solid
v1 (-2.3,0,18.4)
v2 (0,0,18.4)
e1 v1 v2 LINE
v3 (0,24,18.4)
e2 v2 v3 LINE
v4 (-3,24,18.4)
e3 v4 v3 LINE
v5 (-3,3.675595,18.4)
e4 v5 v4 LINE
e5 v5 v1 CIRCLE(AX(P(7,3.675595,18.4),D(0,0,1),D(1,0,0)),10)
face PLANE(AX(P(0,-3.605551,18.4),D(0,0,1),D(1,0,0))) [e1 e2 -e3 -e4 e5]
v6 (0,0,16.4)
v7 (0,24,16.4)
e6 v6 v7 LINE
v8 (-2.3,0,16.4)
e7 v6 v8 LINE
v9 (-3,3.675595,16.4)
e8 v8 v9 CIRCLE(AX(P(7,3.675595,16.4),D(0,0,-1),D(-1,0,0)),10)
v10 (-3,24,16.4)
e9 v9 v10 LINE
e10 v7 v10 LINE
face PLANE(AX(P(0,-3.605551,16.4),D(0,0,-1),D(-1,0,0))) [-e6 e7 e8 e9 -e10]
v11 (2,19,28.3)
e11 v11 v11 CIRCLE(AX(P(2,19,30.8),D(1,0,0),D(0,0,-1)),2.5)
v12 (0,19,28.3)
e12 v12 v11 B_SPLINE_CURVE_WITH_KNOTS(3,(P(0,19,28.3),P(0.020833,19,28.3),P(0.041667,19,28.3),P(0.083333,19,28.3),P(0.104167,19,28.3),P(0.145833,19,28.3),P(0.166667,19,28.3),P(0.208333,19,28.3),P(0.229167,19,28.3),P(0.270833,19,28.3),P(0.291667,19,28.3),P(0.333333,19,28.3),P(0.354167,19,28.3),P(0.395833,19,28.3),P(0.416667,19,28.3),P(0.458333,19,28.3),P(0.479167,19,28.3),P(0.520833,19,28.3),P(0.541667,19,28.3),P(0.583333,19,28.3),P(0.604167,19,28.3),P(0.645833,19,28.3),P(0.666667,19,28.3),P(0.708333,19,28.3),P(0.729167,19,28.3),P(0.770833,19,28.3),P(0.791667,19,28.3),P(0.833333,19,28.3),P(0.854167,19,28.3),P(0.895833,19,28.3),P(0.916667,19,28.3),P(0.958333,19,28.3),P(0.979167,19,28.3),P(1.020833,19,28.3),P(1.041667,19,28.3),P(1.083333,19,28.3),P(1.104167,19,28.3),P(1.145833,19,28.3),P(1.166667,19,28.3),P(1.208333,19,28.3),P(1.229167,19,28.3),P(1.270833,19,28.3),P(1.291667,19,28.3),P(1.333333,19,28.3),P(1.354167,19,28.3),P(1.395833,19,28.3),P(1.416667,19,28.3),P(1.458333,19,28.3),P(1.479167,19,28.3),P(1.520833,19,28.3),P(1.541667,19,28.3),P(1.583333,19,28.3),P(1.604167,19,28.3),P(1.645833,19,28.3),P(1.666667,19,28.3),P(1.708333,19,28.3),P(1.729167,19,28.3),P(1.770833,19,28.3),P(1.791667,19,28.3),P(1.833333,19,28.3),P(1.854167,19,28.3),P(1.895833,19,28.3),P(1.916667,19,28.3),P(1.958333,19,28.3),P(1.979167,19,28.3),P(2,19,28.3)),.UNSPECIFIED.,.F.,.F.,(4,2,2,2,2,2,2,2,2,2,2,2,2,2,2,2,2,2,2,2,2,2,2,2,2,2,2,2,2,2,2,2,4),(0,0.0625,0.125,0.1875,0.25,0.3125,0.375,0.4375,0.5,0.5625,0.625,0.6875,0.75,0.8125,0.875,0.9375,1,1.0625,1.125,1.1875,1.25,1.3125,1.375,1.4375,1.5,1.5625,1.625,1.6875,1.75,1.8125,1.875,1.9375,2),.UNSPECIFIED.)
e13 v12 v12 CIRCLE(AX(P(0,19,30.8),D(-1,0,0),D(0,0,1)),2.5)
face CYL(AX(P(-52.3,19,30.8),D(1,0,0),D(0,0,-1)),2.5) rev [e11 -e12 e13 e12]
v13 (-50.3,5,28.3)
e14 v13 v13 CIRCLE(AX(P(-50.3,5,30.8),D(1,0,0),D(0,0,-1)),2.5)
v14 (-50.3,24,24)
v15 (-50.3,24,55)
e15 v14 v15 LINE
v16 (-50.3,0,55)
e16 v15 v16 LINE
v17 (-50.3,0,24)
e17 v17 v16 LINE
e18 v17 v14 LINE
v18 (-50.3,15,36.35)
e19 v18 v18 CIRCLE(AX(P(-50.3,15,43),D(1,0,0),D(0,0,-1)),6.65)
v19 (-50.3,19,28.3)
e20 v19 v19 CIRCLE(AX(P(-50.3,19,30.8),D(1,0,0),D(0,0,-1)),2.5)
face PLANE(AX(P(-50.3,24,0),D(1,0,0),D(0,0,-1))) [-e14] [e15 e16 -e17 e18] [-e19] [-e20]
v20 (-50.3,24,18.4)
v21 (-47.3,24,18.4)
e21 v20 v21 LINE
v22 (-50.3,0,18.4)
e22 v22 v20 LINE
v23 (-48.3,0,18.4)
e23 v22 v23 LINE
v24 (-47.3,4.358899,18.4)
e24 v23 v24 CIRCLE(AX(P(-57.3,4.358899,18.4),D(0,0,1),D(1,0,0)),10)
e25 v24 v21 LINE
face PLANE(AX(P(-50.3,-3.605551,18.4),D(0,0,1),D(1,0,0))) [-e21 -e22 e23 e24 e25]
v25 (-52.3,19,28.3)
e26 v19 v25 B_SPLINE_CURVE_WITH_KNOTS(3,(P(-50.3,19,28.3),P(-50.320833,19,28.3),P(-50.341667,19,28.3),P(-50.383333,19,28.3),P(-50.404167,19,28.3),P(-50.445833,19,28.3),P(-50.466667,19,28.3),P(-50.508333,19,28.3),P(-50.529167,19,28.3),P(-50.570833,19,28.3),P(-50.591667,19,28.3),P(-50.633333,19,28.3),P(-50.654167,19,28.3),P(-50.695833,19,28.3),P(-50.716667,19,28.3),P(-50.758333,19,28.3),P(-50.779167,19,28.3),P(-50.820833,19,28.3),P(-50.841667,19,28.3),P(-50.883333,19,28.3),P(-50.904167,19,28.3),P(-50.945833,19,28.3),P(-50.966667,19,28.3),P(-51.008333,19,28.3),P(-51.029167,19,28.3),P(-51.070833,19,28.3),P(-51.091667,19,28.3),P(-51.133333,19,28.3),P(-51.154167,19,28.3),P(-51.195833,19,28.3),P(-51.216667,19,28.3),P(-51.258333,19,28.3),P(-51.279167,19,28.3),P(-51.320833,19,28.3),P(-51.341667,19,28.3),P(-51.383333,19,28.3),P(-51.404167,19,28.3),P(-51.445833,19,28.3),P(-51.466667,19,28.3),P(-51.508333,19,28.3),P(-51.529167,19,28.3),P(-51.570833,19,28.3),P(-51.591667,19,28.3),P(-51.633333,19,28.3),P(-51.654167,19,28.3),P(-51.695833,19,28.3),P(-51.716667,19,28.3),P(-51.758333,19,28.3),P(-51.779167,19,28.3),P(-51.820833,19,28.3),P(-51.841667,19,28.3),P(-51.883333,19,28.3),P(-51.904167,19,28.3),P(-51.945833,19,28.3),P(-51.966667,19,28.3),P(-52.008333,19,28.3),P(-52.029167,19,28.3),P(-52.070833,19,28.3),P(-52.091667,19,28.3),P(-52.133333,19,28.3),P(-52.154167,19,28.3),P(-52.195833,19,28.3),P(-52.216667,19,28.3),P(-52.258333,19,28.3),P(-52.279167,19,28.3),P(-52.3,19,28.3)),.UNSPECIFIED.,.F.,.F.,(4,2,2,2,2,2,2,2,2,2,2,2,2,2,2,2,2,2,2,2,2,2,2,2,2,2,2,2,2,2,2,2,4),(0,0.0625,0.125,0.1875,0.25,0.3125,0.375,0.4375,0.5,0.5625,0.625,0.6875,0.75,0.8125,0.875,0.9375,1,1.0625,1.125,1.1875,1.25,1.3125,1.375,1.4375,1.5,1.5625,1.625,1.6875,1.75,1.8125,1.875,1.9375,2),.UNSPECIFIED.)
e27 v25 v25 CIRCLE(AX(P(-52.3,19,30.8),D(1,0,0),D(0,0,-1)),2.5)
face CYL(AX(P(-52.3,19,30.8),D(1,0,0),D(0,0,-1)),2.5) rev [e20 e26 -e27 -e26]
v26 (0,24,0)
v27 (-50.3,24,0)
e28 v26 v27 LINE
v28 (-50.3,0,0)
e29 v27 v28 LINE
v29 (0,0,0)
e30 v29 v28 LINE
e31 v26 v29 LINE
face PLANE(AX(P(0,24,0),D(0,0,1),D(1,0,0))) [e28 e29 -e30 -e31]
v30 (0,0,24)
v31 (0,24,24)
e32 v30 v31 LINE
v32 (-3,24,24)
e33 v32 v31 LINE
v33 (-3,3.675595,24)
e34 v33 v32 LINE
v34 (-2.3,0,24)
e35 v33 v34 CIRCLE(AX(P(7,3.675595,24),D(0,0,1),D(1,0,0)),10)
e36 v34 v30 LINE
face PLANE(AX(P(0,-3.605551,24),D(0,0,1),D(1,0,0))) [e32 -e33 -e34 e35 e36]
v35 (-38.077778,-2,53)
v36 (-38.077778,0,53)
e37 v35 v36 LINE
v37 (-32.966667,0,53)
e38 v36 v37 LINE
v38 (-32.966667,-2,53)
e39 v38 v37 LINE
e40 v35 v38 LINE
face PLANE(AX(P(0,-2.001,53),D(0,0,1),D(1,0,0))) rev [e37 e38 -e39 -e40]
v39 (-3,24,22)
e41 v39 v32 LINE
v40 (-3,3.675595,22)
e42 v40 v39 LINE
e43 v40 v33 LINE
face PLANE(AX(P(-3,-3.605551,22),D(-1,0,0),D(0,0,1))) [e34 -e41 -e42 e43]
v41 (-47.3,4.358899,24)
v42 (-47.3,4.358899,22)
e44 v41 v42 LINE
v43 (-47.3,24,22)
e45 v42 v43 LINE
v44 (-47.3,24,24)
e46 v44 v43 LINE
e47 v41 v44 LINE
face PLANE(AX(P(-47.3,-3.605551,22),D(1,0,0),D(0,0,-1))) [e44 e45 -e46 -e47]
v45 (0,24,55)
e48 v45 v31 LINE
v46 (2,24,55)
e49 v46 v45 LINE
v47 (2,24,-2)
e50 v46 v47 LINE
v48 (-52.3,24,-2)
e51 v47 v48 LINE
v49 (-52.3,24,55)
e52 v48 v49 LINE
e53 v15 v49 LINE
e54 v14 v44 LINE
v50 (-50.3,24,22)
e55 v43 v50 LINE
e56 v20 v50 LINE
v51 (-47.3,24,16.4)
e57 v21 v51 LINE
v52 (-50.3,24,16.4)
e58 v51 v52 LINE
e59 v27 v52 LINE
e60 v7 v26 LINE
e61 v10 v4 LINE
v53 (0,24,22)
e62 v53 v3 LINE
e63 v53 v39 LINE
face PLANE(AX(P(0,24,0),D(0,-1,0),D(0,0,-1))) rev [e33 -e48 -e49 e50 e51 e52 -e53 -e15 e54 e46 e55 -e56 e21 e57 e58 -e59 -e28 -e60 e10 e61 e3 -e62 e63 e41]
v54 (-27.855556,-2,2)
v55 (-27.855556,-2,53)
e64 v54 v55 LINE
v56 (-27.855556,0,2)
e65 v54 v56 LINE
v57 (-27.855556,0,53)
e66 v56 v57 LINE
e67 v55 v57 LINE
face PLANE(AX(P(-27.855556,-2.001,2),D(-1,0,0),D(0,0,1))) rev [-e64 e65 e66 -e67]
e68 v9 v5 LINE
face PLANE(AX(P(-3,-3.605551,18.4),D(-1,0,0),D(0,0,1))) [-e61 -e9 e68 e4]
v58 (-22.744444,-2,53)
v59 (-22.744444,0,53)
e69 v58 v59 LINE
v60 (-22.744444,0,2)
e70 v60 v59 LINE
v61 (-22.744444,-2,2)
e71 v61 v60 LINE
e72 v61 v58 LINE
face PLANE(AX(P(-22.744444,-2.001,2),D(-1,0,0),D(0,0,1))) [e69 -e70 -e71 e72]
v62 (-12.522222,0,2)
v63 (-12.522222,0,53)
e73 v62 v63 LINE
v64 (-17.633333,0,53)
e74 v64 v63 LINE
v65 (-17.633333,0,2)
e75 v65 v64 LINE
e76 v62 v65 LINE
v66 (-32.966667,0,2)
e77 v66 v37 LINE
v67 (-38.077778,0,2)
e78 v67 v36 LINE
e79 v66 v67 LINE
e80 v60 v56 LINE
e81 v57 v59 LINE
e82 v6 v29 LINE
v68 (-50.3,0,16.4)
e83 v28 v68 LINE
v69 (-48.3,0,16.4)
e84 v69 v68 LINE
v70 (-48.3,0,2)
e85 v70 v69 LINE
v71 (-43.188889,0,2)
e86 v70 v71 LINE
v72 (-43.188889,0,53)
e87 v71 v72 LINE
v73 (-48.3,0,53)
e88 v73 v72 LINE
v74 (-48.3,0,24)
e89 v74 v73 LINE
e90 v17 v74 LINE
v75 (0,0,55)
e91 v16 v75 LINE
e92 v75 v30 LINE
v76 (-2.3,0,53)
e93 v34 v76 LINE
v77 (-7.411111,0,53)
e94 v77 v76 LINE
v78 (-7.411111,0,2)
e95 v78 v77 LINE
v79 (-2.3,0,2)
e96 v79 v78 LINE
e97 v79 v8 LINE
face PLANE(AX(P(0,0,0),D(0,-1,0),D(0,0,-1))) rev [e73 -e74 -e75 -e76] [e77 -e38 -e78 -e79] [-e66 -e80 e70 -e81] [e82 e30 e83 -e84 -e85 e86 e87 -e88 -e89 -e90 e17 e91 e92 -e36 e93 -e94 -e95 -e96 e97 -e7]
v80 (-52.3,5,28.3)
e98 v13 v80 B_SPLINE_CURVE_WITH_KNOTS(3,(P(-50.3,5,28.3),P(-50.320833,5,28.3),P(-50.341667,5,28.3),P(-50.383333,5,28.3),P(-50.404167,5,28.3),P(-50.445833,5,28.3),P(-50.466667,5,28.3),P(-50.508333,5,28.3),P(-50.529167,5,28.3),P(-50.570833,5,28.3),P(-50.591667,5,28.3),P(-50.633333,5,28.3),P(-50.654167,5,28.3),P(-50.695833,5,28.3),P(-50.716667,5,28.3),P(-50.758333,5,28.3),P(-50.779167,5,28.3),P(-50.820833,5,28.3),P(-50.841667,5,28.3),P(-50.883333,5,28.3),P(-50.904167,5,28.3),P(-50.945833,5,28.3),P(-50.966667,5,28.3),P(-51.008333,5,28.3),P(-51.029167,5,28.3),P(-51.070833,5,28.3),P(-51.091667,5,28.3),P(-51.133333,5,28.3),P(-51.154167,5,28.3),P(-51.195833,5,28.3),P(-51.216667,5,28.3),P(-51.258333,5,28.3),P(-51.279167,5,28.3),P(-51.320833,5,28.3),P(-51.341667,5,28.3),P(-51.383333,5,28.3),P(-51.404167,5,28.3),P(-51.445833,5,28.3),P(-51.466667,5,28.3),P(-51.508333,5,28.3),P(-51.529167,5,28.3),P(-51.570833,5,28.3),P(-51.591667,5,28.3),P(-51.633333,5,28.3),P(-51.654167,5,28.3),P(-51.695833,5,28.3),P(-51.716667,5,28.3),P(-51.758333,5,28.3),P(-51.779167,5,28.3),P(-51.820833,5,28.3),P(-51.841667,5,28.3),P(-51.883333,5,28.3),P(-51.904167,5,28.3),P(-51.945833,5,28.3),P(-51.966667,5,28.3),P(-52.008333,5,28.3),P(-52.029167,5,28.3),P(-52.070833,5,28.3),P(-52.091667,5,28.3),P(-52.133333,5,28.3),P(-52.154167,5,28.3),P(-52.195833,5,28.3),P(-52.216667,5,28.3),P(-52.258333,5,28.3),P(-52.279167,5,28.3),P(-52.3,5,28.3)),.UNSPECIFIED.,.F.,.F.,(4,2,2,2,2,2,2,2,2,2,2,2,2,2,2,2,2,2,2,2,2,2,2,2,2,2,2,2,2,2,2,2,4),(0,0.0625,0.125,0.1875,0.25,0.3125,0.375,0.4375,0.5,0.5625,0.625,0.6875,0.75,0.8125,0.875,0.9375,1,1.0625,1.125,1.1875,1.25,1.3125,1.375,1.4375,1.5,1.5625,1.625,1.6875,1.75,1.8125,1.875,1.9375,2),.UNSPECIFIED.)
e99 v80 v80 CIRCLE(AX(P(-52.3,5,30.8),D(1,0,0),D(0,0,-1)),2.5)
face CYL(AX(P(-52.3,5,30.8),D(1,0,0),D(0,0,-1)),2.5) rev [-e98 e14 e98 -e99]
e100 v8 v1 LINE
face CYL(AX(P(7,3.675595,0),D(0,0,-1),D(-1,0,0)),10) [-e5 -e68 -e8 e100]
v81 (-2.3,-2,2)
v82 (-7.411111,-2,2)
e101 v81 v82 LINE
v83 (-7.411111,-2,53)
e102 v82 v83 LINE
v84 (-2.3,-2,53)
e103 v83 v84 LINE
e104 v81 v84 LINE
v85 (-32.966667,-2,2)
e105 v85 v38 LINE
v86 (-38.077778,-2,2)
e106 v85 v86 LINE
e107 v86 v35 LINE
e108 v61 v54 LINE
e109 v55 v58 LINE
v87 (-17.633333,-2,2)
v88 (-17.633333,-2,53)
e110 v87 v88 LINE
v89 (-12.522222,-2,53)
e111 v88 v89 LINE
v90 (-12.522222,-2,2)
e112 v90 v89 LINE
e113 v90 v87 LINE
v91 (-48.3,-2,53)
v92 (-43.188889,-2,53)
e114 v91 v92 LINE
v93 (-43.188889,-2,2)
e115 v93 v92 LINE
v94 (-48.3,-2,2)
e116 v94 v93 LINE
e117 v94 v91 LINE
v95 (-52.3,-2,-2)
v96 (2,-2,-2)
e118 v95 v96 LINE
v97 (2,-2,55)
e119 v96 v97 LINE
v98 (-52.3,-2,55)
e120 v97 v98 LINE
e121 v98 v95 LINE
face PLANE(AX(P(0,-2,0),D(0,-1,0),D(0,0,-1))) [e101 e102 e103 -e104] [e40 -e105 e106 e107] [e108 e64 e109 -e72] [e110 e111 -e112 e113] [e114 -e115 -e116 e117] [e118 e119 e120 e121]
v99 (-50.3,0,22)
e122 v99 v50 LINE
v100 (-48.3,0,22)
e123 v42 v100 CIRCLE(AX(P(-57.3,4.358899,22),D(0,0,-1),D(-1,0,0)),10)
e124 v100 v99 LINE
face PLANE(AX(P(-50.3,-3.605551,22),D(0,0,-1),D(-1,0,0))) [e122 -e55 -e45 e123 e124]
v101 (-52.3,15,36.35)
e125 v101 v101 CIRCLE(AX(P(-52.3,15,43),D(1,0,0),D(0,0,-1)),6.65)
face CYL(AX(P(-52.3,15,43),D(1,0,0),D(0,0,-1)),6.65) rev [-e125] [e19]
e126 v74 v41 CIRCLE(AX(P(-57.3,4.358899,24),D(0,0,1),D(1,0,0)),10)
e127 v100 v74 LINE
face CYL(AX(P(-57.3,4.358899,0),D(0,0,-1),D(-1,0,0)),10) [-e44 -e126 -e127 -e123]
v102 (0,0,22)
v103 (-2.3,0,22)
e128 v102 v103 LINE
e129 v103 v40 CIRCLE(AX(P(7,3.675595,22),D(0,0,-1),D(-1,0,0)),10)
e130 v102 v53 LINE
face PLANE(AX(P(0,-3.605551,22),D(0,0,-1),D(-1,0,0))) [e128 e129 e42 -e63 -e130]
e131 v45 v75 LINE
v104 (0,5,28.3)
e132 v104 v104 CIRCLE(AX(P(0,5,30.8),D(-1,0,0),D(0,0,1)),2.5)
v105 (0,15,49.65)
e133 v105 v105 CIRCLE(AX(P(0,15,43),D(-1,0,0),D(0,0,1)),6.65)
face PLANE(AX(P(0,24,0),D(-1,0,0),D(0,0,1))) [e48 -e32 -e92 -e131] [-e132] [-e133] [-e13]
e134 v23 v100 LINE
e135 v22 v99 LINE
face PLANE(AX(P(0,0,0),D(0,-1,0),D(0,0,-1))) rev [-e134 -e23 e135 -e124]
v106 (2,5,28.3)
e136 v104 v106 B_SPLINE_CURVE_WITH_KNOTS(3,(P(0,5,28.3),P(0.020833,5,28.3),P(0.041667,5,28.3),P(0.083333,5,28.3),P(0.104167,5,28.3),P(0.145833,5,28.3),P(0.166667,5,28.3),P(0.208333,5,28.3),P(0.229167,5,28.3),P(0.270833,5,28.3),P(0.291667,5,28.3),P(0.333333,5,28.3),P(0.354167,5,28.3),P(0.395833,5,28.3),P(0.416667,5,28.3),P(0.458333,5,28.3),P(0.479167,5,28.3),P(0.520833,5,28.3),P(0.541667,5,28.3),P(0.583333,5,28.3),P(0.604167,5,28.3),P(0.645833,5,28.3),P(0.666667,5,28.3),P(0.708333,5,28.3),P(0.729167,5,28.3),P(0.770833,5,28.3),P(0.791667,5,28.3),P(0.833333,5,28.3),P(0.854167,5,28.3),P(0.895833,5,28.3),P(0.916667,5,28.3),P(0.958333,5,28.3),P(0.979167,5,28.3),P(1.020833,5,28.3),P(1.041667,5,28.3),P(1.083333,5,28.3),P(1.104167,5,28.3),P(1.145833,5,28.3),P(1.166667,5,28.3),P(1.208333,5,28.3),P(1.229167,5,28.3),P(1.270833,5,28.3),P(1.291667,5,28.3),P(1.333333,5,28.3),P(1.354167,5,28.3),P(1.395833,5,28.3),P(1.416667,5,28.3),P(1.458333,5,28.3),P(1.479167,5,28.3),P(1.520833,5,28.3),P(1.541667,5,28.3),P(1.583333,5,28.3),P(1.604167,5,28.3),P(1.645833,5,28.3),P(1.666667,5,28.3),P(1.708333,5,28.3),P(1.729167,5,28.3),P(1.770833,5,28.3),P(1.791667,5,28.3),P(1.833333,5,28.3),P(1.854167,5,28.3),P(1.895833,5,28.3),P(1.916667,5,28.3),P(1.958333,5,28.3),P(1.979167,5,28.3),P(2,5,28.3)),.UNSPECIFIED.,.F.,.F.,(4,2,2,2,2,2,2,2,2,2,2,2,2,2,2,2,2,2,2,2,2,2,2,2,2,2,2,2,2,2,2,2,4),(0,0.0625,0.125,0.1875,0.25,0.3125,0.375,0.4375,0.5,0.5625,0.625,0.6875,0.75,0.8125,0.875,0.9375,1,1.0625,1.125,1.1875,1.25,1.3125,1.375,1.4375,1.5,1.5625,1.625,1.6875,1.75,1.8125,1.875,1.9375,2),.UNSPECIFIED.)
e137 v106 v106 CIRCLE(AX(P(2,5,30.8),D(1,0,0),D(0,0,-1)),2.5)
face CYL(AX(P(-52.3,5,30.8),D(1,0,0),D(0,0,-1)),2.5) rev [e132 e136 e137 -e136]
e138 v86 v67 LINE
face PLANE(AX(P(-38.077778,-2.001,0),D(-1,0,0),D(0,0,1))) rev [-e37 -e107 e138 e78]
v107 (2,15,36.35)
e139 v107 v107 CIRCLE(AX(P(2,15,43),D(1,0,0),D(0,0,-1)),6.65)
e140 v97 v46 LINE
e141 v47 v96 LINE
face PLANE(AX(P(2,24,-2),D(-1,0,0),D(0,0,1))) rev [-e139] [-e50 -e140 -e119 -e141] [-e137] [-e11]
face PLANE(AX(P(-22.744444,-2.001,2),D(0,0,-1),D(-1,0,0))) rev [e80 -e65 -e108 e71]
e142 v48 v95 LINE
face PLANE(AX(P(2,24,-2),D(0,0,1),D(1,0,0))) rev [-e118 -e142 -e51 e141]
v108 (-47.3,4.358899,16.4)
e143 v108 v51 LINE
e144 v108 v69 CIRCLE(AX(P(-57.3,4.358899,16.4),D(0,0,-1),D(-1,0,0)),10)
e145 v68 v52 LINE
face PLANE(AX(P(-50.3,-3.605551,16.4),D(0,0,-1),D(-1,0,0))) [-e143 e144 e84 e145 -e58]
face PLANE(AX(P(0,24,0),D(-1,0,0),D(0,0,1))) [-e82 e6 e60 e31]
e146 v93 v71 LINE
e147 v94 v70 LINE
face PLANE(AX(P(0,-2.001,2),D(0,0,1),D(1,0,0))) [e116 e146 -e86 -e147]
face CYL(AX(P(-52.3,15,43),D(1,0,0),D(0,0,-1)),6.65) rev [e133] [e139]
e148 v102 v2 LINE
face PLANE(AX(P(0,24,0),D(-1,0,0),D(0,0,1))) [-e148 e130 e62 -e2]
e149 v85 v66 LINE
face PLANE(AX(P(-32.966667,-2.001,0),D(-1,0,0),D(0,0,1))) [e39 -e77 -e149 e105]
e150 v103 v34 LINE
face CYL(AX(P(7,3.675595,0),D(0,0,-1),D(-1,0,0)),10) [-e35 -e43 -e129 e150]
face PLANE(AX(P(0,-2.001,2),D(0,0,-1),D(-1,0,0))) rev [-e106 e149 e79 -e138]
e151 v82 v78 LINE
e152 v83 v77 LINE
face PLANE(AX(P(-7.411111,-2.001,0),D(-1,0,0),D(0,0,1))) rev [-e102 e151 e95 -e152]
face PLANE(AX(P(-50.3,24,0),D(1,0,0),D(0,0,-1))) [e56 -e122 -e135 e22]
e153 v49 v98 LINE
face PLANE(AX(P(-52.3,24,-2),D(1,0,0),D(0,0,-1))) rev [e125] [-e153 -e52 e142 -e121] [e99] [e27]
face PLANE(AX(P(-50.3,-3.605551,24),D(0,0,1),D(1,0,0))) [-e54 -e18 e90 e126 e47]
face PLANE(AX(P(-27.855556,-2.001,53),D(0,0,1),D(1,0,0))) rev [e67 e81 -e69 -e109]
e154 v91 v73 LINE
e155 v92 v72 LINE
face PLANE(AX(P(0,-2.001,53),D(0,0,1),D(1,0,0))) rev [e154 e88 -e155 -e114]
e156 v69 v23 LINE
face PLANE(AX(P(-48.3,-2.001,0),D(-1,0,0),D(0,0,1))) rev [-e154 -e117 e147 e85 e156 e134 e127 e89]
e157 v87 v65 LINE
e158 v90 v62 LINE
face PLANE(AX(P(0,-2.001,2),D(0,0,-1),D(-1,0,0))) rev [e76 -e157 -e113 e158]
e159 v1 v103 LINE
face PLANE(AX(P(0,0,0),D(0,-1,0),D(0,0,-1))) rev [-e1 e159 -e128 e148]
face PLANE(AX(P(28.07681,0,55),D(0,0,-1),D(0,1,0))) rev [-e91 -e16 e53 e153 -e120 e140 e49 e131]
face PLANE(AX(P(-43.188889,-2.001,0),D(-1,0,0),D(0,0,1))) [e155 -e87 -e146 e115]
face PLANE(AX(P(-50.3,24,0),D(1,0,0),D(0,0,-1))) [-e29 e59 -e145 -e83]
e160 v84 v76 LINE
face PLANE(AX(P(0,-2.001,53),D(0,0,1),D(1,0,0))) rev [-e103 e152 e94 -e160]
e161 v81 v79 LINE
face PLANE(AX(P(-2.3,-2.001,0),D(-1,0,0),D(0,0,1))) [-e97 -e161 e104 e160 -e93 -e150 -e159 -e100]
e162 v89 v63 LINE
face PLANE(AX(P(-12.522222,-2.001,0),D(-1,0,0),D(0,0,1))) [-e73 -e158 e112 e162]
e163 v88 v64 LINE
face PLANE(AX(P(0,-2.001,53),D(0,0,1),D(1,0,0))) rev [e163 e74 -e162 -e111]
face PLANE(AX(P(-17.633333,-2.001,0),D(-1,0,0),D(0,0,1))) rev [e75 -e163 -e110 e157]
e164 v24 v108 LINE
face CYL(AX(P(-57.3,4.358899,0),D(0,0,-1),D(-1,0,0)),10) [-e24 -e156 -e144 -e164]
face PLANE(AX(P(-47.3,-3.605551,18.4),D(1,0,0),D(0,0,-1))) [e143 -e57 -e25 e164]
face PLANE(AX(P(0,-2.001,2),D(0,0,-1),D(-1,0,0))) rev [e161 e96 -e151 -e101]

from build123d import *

# Parameters (mm, degrees)
CROQUIS1_W                 = 54.3
CROQUIS1_H                 = 59
CROQUIS1_W_2               = 50.3
CROQUIS1_H_2               = 55
SALIENTE_EXTRUIR1_DEPTH    = 24
CROQUIS2_W                 = 54.3
CROQUIS2_H                 = 59
SALIENTE_EXTRUIR2_DEPTH    = 2
CORTAR_EXTRUIR4_DEPTH      = 54.3
CORTAR_EXTRUIR5_REACH      = 81.601
CROQUIS7_W                 = 5.111111111
CROQUIS7_H                 = 51
CROQUIS7_W_2               = 5.111111112
CORTAR_EXTRUIR6_DEPTH      = 66.864425147
CORTAR_EXTRUIR6_DEPTH_BACK = 66.864425147
CROQUIS8_R                 = 6.65
CORTAR_EXTRUIR7_DEPTH      = 66.864425147
CORTAR_EXTRUIR7_DEPTH_BACK = 66.864425147
CROQUIS9_R                 = 2.5
CROQUIS10_W                = 3
CROQUIS10_H                = 2
SALIENTE_EXTRUIR3_DEPTH    = 24
REDONDEO1_R                = 10


with BuildPart() as part:
    # Croquis1 → Saliente-Extruir1 (new body)
    with BuildSketch(Plane(origin=(0, 0, 0), x_dir=(1, 0, 0), z_dir=(0, 1, 0))):
        with Locations((-25.15, -27.5)):
            Rectangle(CROQUIS1_W, CROQUIS1_H)
        with Locations((-25.15, -27.5)):
            Rectangle(CROQUIS1_W_2, CROQUIS1_H_2, mode=Mode.SUBTRACT)
    extrude(amount=SALIENTE_EXTRUIR1_DEPTH)

    # Croquis2 → Saliente-Extruir2 (add)
    with BuildSketch(Plane.XZ):
        with Locations((-25.15, 27.5)):
            Rectangle(CROQUIS2_W, CROQUIS2_H)
    extrude(amount=SALIENTE_EXTRUIR2_DEPTH)

    # Croquis6 → Cortar-Extruir4 (cut)
    with BuildSketch(Plane.ZY.offset(52.3)):
        Polygon((55, 24), (55, 0), (55, -2), (57, -2), (57, 24), align=None)
    extrude(amount=-CORTAR_EXTRUIR4_DEPTH, mode=Mode.SUBTRACT)

    # Croquis7 → Cortar-Extruir5 (cut, up to next)
    with BuildSketch(Plane(origin=(0, 0, 0), x_dir=(1, 0, 0), z_dir=(0, 1, 0)), mode=Mode.PRIVATE) as cortar_extruir5_sk1:
        with Locations((-45.744444445, -27.5)):
            Rectangle(CROQUIS7_W, CROQUIS7_H)
    cortar_extruir5_tool1 = extrude(cortar_extruir5_sk1.sketch, amount=-CORTAR_EXTRUIR5_REACH, mode=Mode.PRIVATE) & part.part
    # Croquis7 → Cortar-Extruir5 (cut, up to next)
    with BuildSketch(Plane(origin=(0, 0, 0), x_dir=(1, 0, 0), z_dir=(0, 1, 0)), mode=Mode.PRIVATE) as cortar_extruir5_sk2:
        with Locations((-35.522222223, -27.5)):
            Rectangle(CROQUIS7_W, CROQUIS7_H)
    cortar_extruir5_tool2 = extrude(cortar_extruir5_sk2.sketch, amount=-CORTAR_EXTRUIR5_REACH, mode=Mode.PRIVATE) & part.part
    # Croquis7 → Cortar-Extruir5 (cut, up to next)
    with BuildSketch(Plane(origin=(0, 0, 0), x_dir=(1, 0, 0), z_dir=(0, 1, 0)), mode=Mode.PRIVATE) as cortar_extruir5_sk3:
        with Locations((-25.3, -27.5)):
            Rectangle(CROQUIS7_W_2, CROQUIS7_H)
    cortar_extruir5_tool3 = extrude(cortar_extruir5_sk3.sketch, amount=-CORTAR_EXTRUIR5_REACH, mode=Mode.PRIVATE) & part.part
    # Croquis7 → Cortar-Extruir5 (cut, up to next)
    with BuildSketch(Plane(origin=(0, 0, 0), x_dir=(1, 0, 0), z_dir=(0, 1, 0)), mode=Mode.PRIVATE) as cortar_extruir5_sk4:
        with Locations((-15.077777777, -27.5)):
            Rectangle(CROQUIS7_W, CROQUIS7_H)
    cortar_extruir5_tool4 = extrude(cortar_extruir5_sk4.sketch, amount=-CORTAR_EXTRUIR5_REACH, mode=Mode.PRIVATE) & part.part
    # Croquis7 → Cortar-Extruir5 (cut, up to next)
    with BuildSketch(Plane(origin=(0, 0, 0), x_dir=(1, 0, 0), z_dir=(0, 1, 0)), mode=Mode.PRIVATE) as cortar_extruir5_sk5:
        with Locations((-4.855555556, -27.5)):
            Rectangle(CROQUIS7_W, CROQUIS7_H)
    cortar_extruir5_tool5 = extrude(cortar_extruir5_sk5.sketch, amount=-CORTAR_EXTRUIR5_REACH, mode=Mode.PRIVATE) & part.part
    add(cortar_extruir5_tool1.solids().sort_by_distance((-45.744444, 0, 27.5))[0], mode=Mode.SUBTRACT)
    add(cortar_extruir5_tool2.solids().sort_by_distance((-35.522222, 0, 27.5))[0], mode=Mode.SUBTRACT)
    add(cortar_extruir5_tool3.solids().sort_by_distance((-25.3, 0, 27.5))[0], mode=Mode.SUBTRACT)
    add(cortar_extruir5_tool4.solids().sort_by_distance((-15.077778, 0, 27.5))[0], mode=Mode.SUBTRACT)
    add(cortar_extruir5_tool5.solids().sort_by_distance((-4.855556, 0, 27.5))[0], mode=Mode.SUBTRACT)

    # Croquis8 → Cortar-Extruir6 (cut, two sides: drawn at the far end of the back side and taken through both)
    with BuildSketch(Plane(origin=(-25.15, 0, 0), x_dir=(0, 0, -1), z_dir=(1, 0, 0)).offset(-CORTAR_EXTRUIR6_DEPTH_BACK)):
        with Locations((-43, 15)):
            Circle(CROQUIS8_R)
    extrude(amount=CORTAR_EXTRUIR6_DEPTH + CORTAR_EXTRUIR6_DEPTH_BACK, mode=Mode.SUBTRACT)

    # Croquis9 → Cortar-Extruir7 (cut, two sides: drawn at the far end of the back side and taken through both)
    with BuildSketch(Plane(origin=(-25.15, 0, 0), x_dir=(0, 0, -1), z_dir=(1, 0, 0)).offset(-CORTAR_EXTRUIR7_DEPTH_BACK)):
        with Locations((-30.8, 19)):
            Circle(CROQUIS9_R)
        with Locations((-30.8, 5)):
            Circle(CROQUIS9_R)
    extrude(amount=CORTAR_EXTRUIR7_DEPTH + CORTAR_EXTRUIR7_DEPTH_BACK, mode=Mode.SUBTRACT)

    # Croquis10 → Saliente-Extruir3 (add)
    with BuildSketch(Plane(origin=(0, 24, 0), x_dir=(1, 0, 0), z_dir=(0, 1, 0))):
        with Locations((-48.8, -17.4)):
            Rectangle(CROQUIS10_W, CROQUIS10_H)
        with Locations((-48.8, -23)):
            Rectangle(CROQUIS10_W, CROQUIS10_H)
        with Locations((-1.5, -23)):
            Rectangle(CROQUIS10_W, CROQUIS10_H)
        with Locations((-1.5, -17.4)):
            Rectangle(CROQUIS10_W, CROQUIS10_H)
    extrude(amount=-SALIENTE_EXTRUIR3_DEPTH)

    # Redondeo1
    # the kernel refuses this fillet: 10 mm, written as the material it takes off along each edge
    with BuildSketch(Plane(origin=(-3, 0, 7.211012025), x_dir=(0, 1, 0), z_dir=(0, 0, 1)), Plane(origin=(-3, 0, 12.811012025), x_dir=(0, 1, 0), z_dir=(0, 0, 1))) as redondeo1_piece_1:
        with BuildLine():
            CenterArc((3.67559519, -10), REDONDEO1_R, 90, 21.565185015)
            Line((0, -0.7), (-0.073511904, -0.514))
            ThreePointArc((-0.073511904, -0.514), (-0.2, -0.35), (-0.2, 0))
            Line((-0.2, 0), (0, 0.2))
            Line((0, 0.2), (3.67559519, 0.2))
            Line((3.67559519, 0.2), (3.67559519, 0))
        make_face()
    extrude(amount=20.377975949, mode=Mode.SUBTRACT)
    with BuildSketch(Plane(origin=(-47.3, 0, 29.297247359), x_dir=(0, 1, 0), z_dir=(0, 0, -1)), Plane(origin=(-47.3, 0, 34.897247359), x_dir=(0, 1, 0), z_dir=(0, 0, -1))) as redondeo1_piece_2:
        with BuildLine():
            CenterArc((4.358898944, -10), REDONDEO1_R, 90, 25.841932763)
            Line((0, -1), (-0.087177979, -0.82))
            ThreePointArc((-0.087177979, -0.82), (-0.2, -0.5), (-0.2, 0))
            Line((-0.2, 0), (0, 0.2))
            Line((0, 0.2), (4.358898944, 0.2))
            Line((4.358898944, 0.2), (4.358898944, 0))
        make_face()
    extrude(amount=23.794494718, mode=Mode.SUBTRACT)


solid = part.part
